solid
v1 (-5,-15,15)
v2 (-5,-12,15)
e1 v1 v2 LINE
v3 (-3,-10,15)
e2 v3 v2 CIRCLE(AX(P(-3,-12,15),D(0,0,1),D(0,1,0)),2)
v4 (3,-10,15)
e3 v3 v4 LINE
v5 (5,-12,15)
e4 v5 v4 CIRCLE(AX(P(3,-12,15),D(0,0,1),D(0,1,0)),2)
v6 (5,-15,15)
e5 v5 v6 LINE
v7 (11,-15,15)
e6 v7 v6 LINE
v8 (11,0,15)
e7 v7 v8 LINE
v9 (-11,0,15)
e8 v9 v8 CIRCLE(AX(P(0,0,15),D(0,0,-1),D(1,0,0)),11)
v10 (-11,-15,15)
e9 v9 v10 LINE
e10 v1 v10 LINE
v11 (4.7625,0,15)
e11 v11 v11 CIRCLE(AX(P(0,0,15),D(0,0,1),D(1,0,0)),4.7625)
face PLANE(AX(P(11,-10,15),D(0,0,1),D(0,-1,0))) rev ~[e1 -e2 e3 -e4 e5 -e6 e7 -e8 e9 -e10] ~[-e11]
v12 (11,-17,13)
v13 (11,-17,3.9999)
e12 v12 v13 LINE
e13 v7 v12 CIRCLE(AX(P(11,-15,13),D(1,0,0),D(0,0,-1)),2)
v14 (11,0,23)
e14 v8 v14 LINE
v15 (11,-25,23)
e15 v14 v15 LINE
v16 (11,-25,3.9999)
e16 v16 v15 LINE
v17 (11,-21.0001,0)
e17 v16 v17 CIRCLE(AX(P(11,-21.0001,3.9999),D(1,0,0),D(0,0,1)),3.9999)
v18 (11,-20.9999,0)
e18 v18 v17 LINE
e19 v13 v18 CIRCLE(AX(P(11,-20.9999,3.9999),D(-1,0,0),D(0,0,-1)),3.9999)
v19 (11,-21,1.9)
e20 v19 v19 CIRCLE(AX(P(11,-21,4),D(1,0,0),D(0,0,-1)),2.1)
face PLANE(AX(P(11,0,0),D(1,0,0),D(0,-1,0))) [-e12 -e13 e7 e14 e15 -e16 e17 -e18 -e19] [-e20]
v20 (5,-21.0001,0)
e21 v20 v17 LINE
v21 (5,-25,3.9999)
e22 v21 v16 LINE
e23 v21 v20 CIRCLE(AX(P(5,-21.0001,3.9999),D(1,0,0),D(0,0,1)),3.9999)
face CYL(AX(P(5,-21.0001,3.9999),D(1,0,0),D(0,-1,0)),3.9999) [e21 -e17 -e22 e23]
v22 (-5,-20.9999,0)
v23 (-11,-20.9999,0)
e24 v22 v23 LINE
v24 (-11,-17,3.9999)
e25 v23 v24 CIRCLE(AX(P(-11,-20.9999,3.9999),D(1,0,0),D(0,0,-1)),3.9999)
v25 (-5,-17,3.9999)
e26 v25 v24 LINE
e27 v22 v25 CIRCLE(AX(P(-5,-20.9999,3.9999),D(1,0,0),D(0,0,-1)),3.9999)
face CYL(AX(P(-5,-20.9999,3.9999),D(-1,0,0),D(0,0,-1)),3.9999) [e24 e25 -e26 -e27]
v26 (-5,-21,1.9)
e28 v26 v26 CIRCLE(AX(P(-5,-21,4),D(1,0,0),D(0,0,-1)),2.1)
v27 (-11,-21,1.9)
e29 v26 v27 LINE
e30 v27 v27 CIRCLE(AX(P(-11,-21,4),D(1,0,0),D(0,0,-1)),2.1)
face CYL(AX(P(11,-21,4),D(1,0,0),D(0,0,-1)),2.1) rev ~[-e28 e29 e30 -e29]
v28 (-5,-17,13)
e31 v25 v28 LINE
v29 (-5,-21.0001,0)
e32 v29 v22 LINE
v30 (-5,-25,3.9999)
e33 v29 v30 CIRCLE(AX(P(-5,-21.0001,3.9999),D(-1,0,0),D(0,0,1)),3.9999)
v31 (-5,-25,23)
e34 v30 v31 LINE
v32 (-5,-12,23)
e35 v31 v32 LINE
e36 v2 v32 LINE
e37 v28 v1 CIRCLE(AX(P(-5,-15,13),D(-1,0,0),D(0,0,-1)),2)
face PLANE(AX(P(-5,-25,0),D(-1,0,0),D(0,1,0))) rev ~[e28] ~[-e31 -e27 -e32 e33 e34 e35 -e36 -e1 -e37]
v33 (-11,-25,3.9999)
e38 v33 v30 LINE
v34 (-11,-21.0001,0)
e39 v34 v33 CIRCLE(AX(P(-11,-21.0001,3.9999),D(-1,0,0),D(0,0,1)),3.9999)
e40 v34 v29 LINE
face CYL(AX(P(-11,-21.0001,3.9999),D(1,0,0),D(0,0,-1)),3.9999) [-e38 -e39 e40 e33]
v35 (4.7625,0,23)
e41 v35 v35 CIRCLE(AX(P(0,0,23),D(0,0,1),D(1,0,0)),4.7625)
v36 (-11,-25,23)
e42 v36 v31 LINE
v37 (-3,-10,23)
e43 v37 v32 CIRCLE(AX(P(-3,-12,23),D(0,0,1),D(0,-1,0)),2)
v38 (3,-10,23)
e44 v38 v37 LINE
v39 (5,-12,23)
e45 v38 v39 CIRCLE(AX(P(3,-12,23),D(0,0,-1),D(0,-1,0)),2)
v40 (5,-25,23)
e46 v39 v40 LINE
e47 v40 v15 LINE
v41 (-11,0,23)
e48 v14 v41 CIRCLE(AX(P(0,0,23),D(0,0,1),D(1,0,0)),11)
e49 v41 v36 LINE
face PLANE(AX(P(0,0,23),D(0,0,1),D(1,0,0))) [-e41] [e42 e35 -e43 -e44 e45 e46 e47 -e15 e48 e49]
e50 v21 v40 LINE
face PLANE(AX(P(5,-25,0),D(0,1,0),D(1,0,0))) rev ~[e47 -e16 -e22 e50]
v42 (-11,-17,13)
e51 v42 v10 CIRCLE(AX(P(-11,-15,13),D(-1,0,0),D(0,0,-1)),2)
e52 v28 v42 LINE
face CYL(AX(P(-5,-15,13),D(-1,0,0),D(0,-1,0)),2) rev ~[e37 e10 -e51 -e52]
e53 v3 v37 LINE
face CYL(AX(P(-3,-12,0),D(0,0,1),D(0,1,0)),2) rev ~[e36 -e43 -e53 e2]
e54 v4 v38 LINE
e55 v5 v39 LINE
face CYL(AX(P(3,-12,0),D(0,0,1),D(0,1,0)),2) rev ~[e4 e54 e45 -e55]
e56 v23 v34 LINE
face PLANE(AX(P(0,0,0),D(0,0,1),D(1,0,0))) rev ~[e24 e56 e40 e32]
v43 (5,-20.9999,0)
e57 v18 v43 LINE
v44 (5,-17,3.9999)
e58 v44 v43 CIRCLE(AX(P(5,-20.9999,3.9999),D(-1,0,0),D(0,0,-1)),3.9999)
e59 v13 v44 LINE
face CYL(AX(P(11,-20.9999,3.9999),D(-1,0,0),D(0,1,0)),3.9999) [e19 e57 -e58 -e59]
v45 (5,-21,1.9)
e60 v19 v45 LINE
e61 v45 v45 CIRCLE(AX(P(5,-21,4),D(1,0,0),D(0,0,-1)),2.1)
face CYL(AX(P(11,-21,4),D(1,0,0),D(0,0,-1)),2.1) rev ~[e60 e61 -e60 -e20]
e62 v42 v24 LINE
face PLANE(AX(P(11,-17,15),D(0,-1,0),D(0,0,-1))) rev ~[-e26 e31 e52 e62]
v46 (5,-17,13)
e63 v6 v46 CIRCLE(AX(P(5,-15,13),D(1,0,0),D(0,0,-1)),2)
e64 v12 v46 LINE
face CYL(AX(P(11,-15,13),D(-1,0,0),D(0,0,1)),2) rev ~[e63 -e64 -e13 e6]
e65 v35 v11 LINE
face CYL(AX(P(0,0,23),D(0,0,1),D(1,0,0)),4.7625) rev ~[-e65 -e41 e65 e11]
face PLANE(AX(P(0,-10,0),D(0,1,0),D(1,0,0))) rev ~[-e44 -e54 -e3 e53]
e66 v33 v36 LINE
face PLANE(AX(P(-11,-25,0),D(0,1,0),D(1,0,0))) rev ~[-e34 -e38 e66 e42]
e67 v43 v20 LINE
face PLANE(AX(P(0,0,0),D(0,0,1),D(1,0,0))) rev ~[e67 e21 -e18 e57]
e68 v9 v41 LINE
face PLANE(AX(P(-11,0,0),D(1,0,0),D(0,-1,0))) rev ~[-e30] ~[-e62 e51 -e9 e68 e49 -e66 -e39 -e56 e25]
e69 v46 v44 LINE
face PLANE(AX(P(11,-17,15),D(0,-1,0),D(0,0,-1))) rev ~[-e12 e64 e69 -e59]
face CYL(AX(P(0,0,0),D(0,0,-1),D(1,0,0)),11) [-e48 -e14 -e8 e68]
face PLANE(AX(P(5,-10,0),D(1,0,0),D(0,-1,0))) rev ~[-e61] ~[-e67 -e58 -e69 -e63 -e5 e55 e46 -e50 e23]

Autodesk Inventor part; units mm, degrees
ref_plane "YZ Plane" through (0, 0, 0) normal (1, 0, 0) x (0, 1, 0)
ref_plane "XZ Plane" through (0, 0, 0) normal (0, 1, 0) x (-1, 0, 0)
ref_plane "XY Plane" through (0, 0, 0) normal (0, 0, 1) x (1, 0, 0)
sketch "Sketch1" plane through (0, 0, 0) normal (0, 0, 1) x (1, 0, 0)
  circle A0 centre (0, 0) radius 5
  circle A1 centre (0, 0) radius 11
  line L0 (-11, 0) -> (-11, -25)
  line L1 (11, 0) -> (11, -25)
  line L2 (0, 0) -> (0, -54.7816)
  line L3 (-11, -25) -> (-5, -25)
  line L4 (-5, -25) -> (-5, -10)
  line L5 (5, -10) -> (5, -25)
  line L6 (5, -25) -> (11, -25)
  line L7 (-5, -10) -> (5, -10)
  dimension "d0" = 10
  dimension "d1" = 22
  dimension "d4" = 10
  dimension "d6" = 15
  dimension "d22" = 6
  dimension "d23" = 6
extrude "Extrusion1" add sketch "Sketch1" along normal blind 23 contours A0 | A1 L7 | L1 L6 L5 L7 A1 | A1 L7 L4 L3 L0
sketch "Sketch2" plane through (11, -25, 0) normal (1, 0, 0) x (0, 0, -1)
  circle A0 centre (-4, 4) radius 2.1
  line L0 (0, 0) -> (0, 25) projected
  line L1 (0, 25) -> (-23, 25) projected
  line L2 (-23, 0) -> (-23, 25) projected
  line L3 (0, 0) -> (-23, 0) projected
  dimension "d9" = 4.2
  dimension "d10" = 4
  dimension "d20" = 4
extrude "Extrusion2" cut sketch "Sketch2" against normal through all contours A0
fillet "Fillet1" radius 2 2 edges at (-5, -10, 11.5) (5, -10, 11.5)
sketch "Sketch5" plane through (11, -25, 0) normal (1, 0, 0) x (0, 0, -1)
  circle A0 centre (-4, 4) radius 2.1 projected
  line L0 (0, 0) -> (0, 25) projected
  line L1 (0, 25) -> (-23, 25) projected
  line L2 (-23, 0) -> (-23, 25) projected
  line L3 (0, 0) -> (-23, 0) projected
  line L4 (-23, 15) -> (0, 15) projected
  line L5 (0, 15) -> (-23, 15) projected
  line L6 (-15, 8) -> (0, 8)
  line L7 (0, 8) -> (0, 53.1691)
  line L8 (0, 53.1691) -> (-15, 53.1691)
  line L9 (-15, 53.1691) -> (-15, 8)
  line L10 (0, 0) -> (0, 25) projected
  line L11 (0, 25) -> (0, 25) projected
  line L12 (0, 25) -> (-23, 25) projected
  line L13 (-23, 25) -> (-23, 25) projected
  line L14 (0, 25) -> (-23, 25) projected
  dimension "d28" = 4
  dimension "d29" = 15
extrude "Extrusion5" cut sketch "Sketch5" against normal through all contours L6 L9 L4 L0 | L4 L9 L1 L0 | L1 L9 L8 L7
fillet "Fillet2" radius 4 4 edges at (8, -25, 0) (8, -17, 0) (-8, -17, 0) (-8, -25, 0)
fillet "Fillet3" radius 2 2 edges at (8, -17, 15) (-8, -17, 15)
sketch "Sketch6" plane through (0, 0, 23) normal (0, 0, 1) x (1, 0, 0)
  circle A0 centre (0, 0) radius 4.7625
  dimension "d34" = 9.525
extrude "Extrusion6" cut sketch "Sketch6" against normal up to next
properties part number "Piston_Holder" material "Acetal Resin, Black"
